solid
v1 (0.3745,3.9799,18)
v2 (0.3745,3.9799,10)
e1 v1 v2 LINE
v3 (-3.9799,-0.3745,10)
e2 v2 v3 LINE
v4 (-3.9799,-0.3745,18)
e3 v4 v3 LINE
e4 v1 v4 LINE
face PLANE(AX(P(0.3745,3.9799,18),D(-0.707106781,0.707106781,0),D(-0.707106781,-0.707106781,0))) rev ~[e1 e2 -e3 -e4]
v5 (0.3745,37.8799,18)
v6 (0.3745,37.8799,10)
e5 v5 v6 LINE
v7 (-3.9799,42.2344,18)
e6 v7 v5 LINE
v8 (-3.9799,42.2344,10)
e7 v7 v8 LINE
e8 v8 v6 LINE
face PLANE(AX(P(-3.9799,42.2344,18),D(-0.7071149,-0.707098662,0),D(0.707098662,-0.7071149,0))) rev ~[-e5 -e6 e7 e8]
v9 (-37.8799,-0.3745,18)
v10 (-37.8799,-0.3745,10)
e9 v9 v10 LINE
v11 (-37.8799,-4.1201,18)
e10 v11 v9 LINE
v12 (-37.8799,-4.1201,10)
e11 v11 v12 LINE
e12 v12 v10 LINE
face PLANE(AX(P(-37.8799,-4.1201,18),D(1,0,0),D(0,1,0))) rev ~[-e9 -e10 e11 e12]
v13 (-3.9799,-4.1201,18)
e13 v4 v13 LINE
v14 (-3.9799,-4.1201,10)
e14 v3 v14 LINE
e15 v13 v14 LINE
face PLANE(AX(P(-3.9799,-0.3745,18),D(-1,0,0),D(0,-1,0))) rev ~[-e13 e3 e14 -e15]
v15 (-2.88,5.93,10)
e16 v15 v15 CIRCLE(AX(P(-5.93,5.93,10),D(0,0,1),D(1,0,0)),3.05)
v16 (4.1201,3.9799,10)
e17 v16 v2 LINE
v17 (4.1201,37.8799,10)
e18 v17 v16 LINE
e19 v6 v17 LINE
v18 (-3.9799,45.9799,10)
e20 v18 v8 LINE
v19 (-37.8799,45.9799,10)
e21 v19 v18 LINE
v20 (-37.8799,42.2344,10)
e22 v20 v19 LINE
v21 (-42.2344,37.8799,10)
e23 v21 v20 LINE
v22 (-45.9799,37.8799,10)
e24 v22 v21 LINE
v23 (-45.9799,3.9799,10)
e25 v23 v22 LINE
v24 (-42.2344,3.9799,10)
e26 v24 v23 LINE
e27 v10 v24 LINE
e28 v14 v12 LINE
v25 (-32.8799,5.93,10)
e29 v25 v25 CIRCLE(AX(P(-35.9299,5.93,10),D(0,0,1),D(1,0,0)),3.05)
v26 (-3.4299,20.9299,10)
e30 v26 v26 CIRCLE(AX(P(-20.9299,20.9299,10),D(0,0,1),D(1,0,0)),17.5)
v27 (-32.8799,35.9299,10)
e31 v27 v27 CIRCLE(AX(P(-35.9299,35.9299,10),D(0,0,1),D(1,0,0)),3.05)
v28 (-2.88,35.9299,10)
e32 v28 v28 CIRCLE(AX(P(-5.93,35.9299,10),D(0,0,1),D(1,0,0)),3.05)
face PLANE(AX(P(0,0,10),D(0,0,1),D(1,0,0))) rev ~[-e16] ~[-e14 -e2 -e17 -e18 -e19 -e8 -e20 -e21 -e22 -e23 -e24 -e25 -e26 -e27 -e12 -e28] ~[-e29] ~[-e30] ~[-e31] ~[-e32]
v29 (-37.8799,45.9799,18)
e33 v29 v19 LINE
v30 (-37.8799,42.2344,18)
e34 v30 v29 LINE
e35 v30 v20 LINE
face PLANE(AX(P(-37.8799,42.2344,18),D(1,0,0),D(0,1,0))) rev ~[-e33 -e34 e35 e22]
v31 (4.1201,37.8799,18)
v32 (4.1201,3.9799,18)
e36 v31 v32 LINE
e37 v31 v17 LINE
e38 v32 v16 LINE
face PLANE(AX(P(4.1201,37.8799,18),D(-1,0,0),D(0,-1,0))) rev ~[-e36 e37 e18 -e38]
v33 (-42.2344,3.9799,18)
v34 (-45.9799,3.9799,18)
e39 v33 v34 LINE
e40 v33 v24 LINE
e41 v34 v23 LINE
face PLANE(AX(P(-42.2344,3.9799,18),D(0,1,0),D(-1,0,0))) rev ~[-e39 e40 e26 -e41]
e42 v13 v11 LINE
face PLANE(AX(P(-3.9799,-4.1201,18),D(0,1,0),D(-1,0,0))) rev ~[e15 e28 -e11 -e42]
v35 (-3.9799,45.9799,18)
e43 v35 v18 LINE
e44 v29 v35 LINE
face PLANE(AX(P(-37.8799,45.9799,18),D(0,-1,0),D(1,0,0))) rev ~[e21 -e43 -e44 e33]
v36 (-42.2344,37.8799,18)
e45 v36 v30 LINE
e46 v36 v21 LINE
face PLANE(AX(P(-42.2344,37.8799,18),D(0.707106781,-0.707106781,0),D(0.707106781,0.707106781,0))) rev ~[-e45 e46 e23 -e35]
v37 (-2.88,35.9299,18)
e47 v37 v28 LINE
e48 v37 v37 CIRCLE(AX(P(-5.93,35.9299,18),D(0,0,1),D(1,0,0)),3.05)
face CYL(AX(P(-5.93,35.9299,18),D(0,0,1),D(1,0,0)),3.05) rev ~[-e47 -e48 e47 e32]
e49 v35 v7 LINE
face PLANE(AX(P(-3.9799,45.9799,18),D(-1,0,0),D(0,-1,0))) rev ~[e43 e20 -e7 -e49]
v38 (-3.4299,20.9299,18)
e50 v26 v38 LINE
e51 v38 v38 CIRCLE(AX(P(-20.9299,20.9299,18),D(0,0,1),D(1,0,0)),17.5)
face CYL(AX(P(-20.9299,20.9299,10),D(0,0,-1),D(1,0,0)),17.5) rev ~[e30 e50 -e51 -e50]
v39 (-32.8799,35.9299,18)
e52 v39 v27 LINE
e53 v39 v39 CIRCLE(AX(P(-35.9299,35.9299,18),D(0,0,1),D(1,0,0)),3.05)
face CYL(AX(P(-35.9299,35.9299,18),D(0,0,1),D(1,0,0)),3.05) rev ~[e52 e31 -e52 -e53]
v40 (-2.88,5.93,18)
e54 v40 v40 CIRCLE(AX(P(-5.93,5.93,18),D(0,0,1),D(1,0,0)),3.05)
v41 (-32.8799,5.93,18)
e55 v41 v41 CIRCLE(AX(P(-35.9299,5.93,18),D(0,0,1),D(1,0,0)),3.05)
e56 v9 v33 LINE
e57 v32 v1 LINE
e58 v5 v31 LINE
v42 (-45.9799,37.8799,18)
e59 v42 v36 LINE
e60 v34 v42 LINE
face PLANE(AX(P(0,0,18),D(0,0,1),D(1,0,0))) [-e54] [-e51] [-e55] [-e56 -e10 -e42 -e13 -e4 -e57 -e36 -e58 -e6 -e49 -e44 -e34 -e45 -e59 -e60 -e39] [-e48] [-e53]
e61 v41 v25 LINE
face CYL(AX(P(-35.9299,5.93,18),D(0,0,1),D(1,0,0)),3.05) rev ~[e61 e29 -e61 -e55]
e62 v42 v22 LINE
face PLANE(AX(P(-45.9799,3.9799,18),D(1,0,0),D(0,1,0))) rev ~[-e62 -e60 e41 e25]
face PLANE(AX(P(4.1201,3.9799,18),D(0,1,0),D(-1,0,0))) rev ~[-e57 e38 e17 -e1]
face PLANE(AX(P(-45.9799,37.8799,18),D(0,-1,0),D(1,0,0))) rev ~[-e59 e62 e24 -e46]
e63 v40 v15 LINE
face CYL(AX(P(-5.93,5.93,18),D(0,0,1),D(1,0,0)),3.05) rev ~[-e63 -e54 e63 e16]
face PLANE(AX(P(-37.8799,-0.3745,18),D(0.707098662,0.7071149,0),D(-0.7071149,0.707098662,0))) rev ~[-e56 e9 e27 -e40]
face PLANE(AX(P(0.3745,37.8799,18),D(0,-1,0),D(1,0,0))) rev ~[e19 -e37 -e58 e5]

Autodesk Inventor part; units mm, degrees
ref_plane "YZ Plane" through (0, 0, 0) normal (1, 0, 0) x (0, 1, 0)
ref_plane "XZ Plane" through (0, 0, 0) normal (0, 1, 0) x (-1, 0, 0)
ref_plane "Work Plane1" through (0, 0, 10) normal (0, 0, 1) x (1, 0, 0)
sketch "Sketch1" plane through (0, 0, 10) normal (0, 0, 1) x (1, 0, 0)
  line L0 (-4.0299, -0.3538) -> (-2.2322, 1.4439) construction
  arc A0 (-1.4439, 2.2322) -> (-2.2322, 1.4439) centre (-0.9299, 0.9299) ccw construction
  line L1 (-1.4439, 2.2322) -> (0.3538, 4.0299) construction
  line L2 (-37.8299, 42.8299) -> (-37.8299, 37.8299) construction
  line L3 (-37.8299, 37.8299) -> (-42.9208, 37.8299) construction
  line L4 (-37.8299, 42.2137) -> (-37.8299, 45.8299) construction
  line L5 (-37.8299, 45.8299) -> (-4.0299, 45.8299) construction
  line L6 (-4.0299, 45.8299) -> (-4.0299, 42.2137) construction
  line L7 (-4.0299, 4.0299) -> (0.3538, 4.0299) projected
  circle A1 centre (-20.9299, 20.9299) radius 17.5 projected
  line L8 (-20.9299, 58.9723) -> (17.1124, 20.9299) construction
  line L9 (17.1124, 20.9299) -> (-20.9299, -17.1124) construction
  line L10 (-20.9299, -17.1124) -> (-58.9723, 20.9299) construction
  line L11 (-58.9723, 20.9299) -> (-20.9299, 58.9723) construction
  line L12 (-20.9299, 58.9723) -> (-20.9299, -17.1124) construction
  line L13 (17.1124, 20.9299) -> (-58.9723, 20.9299) construction
  line L14 (-20.9299, 58.9723) -> (32.8701, 58.9723) construction
  line L15 (-43.4299, 43.4299) -> (1.5701, 43.4299) construction
  line L16 (1.5701, 43.4299) -> (1.5701, -1.5701) construction
  line L17 (1.5701, -1.5701) -> (-43.4299, -1.5701) construction
  line L18 (-43.4299, -1.5701) -> (-43.4299, 43.4299) construction
  line L19 (-43.4299, 43.4299) -> (1.5701, -1.5701) construction
  line L20 (1.5701, 43.4299) -> (-43.4299, -1.5701) construction
  line L21 (-43.4299, 5.3876) -> (-43.4299, 36.4723)
  line L22 (-43.4299, 36.4723) -> (-36.4723, 43.4299)
  line L23 (-36.4723, 43.4299) -> (-5.3876, 43.4299)
  line L24 (-5.3876, 43.4299) -> (1.5701, 36.4723)
  line L25 (1.5701, 36.4723) -> (1.5701, 5.3876)
  line L26 (1.5701, 5.3876) -> (-5.3876, -1.5701)
  line L27 (-5.3876, -1.5701) -> (-36.4723, -1.5701)
  line L28 (-36.4723, -1.5701) -> (-43.4299, 5.3876)
  line L29 (-4.0299, 42.2137) -> (-37.8299, 42.2137) projected
  line L30 (-4.0299, -0.3538) -> (-4.0299, 4.0299) projected
  point P0 (-37.8299, 4.0299)
  point P1 (-20.9299, 20.9299)
  dimension "d18" = 53.8
  dimension "d19" = 45
  dimension "d20" = 53.8
  dimension "d21" = 45
  dimension "d22" = 45
extrude "Extrusion1" add sketch "Sketch1" along normal blind 8
sketch "Sketch2" plane through (0, 0, 18) normal (0, 0, 1) x (1, 0, 0)
  circle A0 centre (-35.9299, 35.9299) radius 3.0099 construction
  circle A1 centre (-5.93, 35.9299) radius 3.0099 construction
  circle A2 centre (-5.93, 5.93) radius 3.0099 construction
  circle A3 centre (-35.9299, 5.93) radius 3.0099 construction
  circle A4 centre (-35.9299, 35.9299) radius 3.05
  circle A5 centre (-5.93, 35.9299) radius 3.05
  circle A6 centre (-5.93, 5.93) radius 3.05
  circle A7 centre (-35.9299, 5.93) radius 3.05
  point P0 (0, 0)
  dimension "d1" = 6.1
  dimension "d31" = 6.1
  dimension "d32" = 6.1
  dimension "d33" = 6.1
ref_plane "Work Plane2" through (-40.9959, 0.8639, 22.2359) normal (0, 0, 1) x (1, 0, 0)
extrude "Extrusion2" cut sketch "Sketch2" against normal through all
sketch "Sketch3" plane through (0, 0, 10) normal (0, 0, -1) x (-1, 0, 0)
  line L0 (37.8299, -0.4701) -> (37.8299, 4.0299) construction
  line L1 (4.0299, 4.0299) -> (4.0299, -0.4701) construction
  line L2 (37.8299, -0.4701) -> (37.8299, 1.1886) construction
  line L3 (4.0299, -3.9701) -> (4.0299, -0.3538) construction
  line L4 (45.8299, 4.0299) -> (42.2137, 4.0299) construction
  line L5 (-0.3538, 4.0299) -> (-3.9701, 4.0299) construction
  line L6 (-3.9701, 37.8299) -> (-0.3538, 37.8299) construction
  line L7 (4.0299, 42.2137) -> (4.0299, 45.8299) construction
  line L8 (37.8299, 45.8299) -> (37.8299, 42.2137) construction
  line L9 (42.2137, 37.8299) -> (45.8299, 37.8299) construction
  line L10 (40.4657, 37.7299) -> (45.8299, 37.7299)
  line L11 (45.8299, 37.7299) -> (45.8299, 4.1299)
  line L12 (45.8299, 4.1299) -> (40.4657, 4.1299)
  line L13 (40.4657, 4.1299) -> (40.4657, 37.7299)
  line L14 (37.7299, 2.4952) -> (4.1299, 2.4952)
  line L15 (4.1299, 2.4952) -> (4.1299, -3.9701)
  line L16 (4.1299, -3.9701) -> (37.7299, -3.9701)
  line L17 (37.7299, -3.9701) -> (37.7299, 2.4952)
  line L18 (1.8946, 4.1299) -> (-3.9701, 4.1299)
  line L19 (-3.9701, 4.1299) -> (-3.9701, 37.7299)
  line L20 (-3.9701, 37.7299) -> (1.8946, 37.7299)
  line L21 (1.8946, 37.7299) -> (1.8946, 4.1299)
  line L22 (4.1299, 40.7326) -> (37.7299, 40.7326)
  line L23 (37.7299, 40.7326) -> (37.7299, 45.8299)
  line L24 (37.7299, 45.8299) -> (4.1299, 45.8299)
  line L25 (4.1299, 45.8299) -> (4.1299, 40.7326)
  point P0 (0, 0)
  dimension "d23" = 0.1
  dimension "d24" = 0.1
  dimension "d25" = 0.1
  dimension "d26" = 0.1
  dimension "d27" = 0.1
extrude "Extrusion3" add sketch "Sketch3" against normal up to surface (8 mm away)
sketch "Sketch4" plane through (0, 0, 18) normal (0, 0, 1) x (1, 0, 0)
  line L0 (3.9701, 4.1299) -> (0.3124, 4.1299) projected
  line L1 (3.9701, 37.7299) -> (3.9701, 4.1299) projected
  line L2 (0.3124, 37.7299) -> (3.9701, 37.7299) projected
  line L3 (0.3124, 37.7299) -> (-4.1299, 42.1723) projected
  line L4 (-4.1299, 45.8299) -> (-4.1299, 42.1723) projected
  line L5 (-37.7299, 45.8299) -> (-4.1299, 45.8299) projected
  line L6 (-37.7299, 42.1723) -> (-37.7299, 45.8299) projected
  line L7 (-37.7299, 42.1723) -> (-42.1723, 37.7299) projected
  line L8 (-45.8299, 37.7299) -> (-42.1723, 37.7299) projected
  line L9 (-45.8299, 4.1299) -> (-45.8299, 37.7299) projected
  line L10 (-42.1723, 4.1299) -> (-45.8299, 4.1299) projected
  line L11 (-42.1723, 4.1299) -> (-37.7299, -0.3124) projected
  line L12 (-37.7299, -3.9701) -> (-37.7299, -0.3124) projected
  line L13 (-4.1299, -3.9701) -> (-37.7299, -3.9701) projected
  line L14 (-4.1299, -0.3124) -> (-4.1299, -3.9701) projected
  line L15 (-4.1299, -0.3124) -> (0.3124, 4.1299) projected
  circle A0 centre (-20.9299, 20.9299) radius 17.5 projected
  circle A1 centre (-35.9299, 5.93) radius 3.05 projected
  circle A2 centre (-5.93, 35.9299) radius 3.05 projected
  circle A3 centre (-35.9299, 35.9299) radius 3.05 projected
  circle A4 centre (-5.93, 5.93) radius 3.05 projected
  line L16 (-3.9799, 45.9799) -> (-3.9799, 42.2344)
  line L17 (-3.9799, 42.2344) -> (0.3745, 37.8799)
  line L18 (0.3745, 37.8799) -> (4.1201, 37.8799)
  line L19 (4.1201, 37.8799) -> (4.1201, 3.9799)
  line L20 (4.1201, 3.9799) -> (0.3745, 3.9799)
  line L21 (0.3745, 3.9799) -> (-3.9799, -0.3745)
  line L22 (-3.9799, -0.3745) -> (-3.9799, -4.1201)
  line L23 (-3.9799, -4.1201) -> (-37.8799, -4.1201)
  line L24 (-37.8799, -4.1201) -> (-37.8799, -0.3745)
  line L25 (-37.8799, -0.3745) -> (-42.2344, 3.9799)
  line L26 (-42.2344, 3.9799) -> (-45.9799, 3.9799)
  line L27 (-45.9799, 3.9799) -> (-45.9799, 37.8799)
  line L28 (-45.9799, 37.8799) -> (-42.2344, 37.8799)
  line L29 (-42.2344, 37.8799) -> (-37.8799, 42.2344)
  line L30 (-37.8799, 42.2344) -> (-37.8799, 45.9799)
  line L31 (-37.8799, 45.9799) -> (-3.9799, 45.9799)
  point P0 (0, 0)
  dimension "d34" = 0.15
extrude "Extrusion4" add sketch "Sketch4" against normal up to surface (8 mm away) contours L16 L17 L18 L19 L20 L21 L22 L23 L24 L25 L26 L27 L28 L29 L30 L31
equation "\"d31\" = d1"
equation "\"d32\" = d1"
equation "\"d33\" = d1"
properties part number "20_Cube_Insert_Thorlabs_Holes"
